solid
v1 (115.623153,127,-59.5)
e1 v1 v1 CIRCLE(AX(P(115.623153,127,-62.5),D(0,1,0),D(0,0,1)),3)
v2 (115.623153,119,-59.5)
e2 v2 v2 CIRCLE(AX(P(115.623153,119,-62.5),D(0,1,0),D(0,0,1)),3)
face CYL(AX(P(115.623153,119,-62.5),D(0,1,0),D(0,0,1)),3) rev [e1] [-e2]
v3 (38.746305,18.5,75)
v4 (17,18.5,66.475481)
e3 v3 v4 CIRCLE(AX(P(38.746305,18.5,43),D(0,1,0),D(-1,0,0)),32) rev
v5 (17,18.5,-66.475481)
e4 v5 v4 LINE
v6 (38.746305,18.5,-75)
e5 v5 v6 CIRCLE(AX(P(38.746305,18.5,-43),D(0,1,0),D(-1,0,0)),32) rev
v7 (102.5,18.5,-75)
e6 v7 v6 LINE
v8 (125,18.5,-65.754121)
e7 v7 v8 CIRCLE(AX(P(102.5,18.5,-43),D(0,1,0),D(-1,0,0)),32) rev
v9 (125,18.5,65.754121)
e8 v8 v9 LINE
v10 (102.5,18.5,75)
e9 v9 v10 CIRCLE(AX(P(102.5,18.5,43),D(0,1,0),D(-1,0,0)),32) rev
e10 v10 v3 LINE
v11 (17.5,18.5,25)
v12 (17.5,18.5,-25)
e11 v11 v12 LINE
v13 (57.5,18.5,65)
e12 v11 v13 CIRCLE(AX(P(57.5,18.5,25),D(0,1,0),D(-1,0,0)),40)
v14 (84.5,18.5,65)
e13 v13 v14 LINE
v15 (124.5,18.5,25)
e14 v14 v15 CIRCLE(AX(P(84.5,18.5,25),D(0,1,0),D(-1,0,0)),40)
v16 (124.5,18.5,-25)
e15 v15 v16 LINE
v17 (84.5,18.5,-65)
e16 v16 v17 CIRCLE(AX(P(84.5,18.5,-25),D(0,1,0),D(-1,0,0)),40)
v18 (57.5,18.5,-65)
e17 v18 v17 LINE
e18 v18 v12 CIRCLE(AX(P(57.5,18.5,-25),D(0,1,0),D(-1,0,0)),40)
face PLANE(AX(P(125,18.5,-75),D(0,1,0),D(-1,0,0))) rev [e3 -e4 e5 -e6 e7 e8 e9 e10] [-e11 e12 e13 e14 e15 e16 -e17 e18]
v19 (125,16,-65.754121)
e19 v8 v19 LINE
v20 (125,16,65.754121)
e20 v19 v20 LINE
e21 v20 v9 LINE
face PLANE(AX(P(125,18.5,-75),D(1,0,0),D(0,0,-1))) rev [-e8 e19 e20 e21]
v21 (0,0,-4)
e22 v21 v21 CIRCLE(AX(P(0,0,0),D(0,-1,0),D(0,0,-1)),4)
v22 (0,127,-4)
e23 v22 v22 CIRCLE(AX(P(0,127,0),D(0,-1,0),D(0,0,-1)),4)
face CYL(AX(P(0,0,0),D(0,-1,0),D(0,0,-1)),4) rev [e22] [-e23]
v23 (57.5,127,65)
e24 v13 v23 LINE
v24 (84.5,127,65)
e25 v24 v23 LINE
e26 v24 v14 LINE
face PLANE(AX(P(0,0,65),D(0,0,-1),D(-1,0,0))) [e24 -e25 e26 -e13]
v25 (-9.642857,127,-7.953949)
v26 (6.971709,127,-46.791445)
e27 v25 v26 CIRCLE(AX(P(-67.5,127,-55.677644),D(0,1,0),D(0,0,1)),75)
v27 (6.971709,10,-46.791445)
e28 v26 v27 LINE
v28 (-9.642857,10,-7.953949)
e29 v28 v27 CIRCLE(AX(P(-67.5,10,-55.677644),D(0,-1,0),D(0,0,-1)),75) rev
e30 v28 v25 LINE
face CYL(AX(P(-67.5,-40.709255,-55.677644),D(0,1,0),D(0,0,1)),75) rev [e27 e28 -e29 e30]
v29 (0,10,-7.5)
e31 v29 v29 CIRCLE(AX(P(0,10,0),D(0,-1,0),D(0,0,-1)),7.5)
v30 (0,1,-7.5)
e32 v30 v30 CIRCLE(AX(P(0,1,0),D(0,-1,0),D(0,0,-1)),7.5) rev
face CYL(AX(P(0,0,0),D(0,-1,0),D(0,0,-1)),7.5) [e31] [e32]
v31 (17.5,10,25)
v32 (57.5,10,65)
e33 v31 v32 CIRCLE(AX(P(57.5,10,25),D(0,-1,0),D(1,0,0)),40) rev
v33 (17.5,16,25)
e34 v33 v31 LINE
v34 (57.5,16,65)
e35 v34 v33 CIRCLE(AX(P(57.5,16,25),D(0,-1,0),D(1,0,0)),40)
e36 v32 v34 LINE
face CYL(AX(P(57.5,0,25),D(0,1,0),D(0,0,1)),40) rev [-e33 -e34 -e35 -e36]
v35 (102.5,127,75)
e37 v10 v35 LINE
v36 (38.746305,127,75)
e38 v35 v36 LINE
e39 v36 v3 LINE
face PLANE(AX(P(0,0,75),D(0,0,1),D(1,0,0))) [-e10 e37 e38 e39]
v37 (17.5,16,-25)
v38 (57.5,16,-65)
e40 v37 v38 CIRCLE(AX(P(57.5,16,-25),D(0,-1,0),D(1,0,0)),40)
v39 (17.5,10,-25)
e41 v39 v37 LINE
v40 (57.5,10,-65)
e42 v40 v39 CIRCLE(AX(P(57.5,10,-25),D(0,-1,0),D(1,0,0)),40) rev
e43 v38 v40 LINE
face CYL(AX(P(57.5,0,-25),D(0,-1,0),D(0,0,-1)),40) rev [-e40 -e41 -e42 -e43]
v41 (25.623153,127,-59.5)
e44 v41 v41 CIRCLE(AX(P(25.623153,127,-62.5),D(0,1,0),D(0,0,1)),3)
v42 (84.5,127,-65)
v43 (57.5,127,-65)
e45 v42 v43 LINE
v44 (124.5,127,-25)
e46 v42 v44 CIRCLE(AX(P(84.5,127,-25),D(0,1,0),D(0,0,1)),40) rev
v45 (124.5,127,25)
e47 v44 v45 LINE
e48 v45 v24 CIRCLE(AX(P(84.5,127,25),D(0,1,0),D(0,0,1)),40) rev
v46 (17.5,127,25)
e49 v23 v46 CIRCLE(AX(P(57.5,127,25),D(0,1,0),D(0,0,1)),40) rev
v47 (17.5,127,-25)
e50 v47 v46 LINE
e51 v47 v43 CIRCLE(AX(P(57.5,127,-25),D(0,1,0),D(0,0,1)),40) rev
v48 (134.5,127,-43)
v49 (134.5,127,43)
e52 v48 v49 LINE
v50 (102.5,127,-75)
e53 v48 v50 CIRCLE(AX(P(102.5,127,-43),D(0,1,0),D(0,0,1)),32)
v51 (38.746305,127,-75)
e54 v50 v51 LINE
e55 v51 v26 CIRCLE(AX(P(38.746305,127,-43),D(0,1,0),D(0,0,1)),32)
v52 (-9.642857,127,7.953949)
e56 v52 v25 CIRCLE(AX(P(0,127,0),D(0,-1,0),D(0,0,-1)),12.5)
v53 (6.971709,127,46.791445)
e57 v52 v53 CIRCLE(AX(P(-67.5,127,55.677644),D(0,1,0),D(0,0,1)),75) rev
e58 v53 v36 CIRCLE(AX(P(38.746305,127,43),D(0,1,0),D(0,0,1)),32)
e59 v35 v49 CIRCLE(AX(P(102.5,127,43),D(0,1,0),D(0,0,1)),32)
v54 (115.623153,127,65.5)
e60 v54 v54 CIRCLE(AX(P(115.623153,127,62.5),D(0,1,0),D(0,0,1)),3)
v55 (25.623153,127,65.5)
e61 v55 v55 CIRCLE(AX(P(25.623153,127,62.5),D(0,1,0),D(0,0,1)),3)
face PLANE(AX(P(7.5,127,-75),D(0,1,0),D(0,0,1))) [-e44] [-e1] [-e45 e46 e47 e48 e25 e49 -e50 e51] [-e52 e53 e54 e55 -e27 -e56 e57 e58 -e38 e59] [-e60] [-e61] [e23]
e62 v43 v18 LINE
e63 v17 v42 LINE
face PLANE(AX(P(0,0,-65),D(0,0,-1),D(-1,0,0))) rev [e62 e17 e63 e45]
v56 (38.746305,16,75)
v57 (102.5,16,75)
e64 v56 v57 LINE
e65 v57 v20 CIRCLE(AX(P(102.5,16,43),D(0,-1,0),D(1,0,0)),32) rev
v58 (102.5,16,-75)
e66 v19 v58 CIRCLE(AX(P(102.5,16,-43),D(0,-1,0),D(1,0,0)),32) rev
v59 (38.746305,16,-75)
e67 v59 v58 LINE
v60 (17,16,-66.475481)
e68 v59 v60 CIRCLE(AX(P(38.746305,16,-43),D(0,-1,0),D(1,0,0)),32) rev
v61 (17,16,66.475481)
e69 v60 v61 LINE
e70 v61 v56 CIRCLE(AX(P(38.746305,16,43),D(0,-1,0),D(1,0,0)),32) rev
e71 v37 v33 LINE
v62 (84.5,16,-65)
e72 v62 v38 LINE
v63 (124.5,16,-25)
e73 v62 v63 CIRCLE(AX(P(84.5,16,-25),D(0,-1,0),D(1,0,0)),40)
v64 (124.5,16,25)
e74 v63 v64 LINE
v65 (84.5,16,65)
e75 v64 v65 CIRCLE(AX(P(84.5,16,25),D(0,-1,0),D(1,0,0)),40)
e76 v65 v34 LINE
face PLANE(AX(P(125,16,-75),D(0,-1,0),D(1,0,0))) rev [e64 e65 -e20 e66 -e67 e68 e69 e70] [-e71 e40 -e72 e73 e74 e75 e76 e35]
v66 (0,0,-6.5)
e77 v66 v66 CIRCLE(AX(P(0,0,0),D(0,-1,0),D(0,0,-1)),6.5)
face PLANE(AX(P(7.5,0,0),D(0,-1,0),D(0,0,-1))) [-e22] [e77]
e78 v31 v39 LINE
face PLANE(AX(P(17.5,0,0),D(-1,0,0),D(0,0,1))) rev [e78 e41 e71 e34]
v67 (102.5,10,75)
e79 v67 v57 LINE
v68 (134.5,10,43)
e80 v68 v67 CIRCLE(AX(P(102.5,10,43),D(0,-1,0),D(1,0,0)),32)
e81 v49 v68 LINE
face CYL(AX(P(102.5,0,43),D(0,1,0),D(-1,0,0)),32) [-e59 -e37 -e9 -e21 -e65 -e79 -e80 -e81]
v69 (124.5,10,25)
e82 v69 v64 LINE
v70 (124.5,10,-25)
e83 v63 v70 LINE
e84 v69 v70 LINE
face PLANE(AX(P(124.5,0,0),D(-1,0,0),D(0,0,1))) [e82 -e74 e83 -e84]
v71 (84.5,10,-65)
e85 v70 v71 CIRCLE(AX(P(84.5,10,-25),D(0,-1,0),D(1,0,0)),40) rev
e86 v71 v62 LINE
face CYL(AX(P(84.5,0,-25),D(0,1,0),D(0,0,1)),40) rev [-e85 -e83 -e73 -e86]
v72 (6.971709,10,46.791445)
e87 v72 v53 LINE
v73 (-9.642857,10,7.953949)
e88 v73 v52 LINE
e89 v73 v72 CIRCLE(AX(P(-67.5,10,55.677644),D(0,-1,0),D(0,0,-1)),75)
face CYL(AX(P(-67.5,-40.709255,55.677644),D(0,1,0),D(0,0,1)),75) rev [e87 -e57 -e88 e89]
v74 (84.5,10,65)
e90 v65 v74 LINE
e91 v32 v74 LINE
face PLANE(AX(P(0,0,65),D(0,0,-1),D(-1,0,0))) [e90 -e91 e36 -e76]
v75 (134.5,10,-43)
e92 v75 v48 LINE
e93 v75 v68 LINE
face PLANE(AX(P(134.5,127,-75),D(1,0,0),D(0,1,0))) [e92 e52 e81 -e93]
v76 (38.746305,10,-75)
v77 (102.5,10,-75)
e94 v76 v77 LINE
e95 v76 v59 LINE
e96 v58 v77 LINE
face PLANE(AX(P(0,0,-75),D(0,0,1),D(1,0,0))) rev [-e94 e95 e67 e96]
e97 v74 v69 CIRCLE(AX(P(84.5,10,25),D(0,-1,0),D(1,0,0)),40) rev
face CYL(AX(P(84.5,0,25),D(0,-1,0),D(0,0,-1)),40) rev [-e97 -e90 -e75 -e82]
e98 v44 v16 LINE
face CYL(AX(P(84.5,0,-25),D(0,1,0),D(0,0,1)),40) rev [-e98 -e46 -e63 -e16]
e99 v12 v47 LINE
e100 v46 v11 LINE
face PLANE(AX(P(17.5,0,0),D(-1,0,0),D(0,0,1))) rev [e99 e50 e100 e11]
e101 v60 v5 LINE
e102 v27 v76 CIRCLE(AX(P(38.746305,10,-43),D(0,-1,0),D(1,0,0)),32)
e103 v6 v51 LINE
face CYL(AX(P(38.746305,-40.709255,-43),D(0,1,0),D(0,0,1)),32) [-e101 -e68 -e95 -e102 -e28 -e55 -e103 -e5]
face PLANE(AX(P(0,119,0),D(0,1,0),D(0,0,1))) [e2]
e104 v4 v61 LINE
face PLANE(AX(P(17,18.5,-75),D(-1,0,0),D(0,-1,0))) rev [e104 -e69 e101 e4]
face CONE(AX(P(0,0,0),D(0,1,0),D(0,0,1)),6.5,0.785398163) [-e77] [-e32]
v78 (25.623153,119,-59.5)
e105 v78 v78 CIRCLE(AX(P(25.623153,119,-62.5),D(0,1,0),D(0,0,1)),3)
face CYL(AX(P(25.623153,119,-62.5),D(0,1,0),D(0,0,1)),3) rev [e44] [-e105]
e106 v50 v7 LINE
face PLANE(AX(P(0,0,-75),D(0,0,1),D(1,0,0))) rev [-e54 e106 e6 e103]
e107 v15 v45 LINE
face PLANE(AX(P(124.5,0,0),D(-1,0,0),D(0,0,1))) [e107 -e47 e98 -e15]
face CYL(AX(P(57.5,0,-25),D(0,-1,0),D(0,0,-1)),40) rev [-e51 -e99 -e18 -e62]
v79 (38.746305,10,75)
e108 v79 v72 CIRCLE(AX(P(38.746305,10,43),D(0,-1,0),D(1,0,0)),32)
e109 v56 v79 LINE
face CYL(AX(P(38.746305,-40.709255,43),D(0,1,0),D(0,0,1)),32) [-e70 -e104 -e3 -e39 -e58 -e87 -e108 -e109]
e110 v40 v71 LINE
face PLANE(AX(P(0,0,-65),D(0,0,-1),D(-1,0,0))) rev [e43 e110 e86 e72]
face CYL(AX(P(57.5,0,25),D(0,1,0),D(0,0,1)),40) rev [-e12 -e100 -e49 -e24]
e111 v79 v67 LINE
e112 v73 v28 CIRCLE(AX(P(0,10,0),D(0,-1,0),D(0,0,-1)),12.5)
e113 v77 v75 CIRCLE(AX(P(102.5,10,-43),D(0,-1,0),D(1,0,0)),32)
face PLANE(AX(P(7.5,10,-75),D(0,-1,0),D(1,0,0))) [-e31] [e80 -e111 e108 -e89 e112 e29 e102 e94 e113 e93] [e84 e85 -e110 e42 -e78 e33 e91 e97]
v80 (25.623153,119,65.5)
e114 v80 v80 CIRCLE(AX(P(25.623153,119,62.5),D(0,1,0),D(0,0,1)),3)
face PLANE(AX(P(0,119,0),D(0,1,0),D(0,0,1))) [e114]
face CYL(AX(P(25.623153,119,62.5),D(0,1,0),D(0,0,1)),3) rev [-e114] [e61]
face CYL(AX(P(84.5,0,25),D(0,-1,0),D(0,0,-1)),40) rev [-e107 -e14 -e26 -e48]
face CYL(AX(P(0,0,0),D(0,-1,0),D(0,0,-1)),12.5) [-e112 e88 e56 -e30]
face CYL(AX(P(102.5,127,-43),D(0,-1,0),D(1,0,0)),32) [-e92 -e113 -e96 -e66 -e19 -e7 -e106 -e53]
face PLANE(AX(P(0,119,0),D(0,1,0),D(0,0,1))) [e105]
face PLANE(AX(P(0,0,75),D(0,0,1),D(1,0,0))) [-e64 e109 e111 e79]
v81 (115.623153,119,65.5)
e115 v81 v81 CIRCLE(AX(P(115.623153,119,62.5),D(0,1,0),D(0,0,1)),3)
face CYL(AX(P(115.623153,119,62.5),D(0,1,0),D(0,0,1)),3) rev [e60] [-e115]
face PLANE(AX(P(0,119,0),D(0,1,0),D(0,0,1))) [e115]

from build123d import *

# Parameters (mm, degrees)
CUT_EXTRUDE1_REACH       = 130.224
SKETCH3_W                = 13.598117377
SKETCH3_H                = 26.0138757
BOSS_EXTRUDE1_DEPTH      = 75
BOSS_EXTRUDE1_DEPTH_BACK = 75
SKETCH2_W                = 127
SKETCH2_H                = 117
BOSS_EXTRUDE3_START      = -117
BOSS_EXTRUDE3_DEPTH      = 117
CUT_EXTRUDE2_DEPTH       = 200.610245228
CUT_EXTRUDE2_DEPTH_BACK  = 200.610245228
SKETCH5_W                = 107
SKETCH5_H                = 130
CUT_EXTRUDE3_DEPTH       = 239.158035766
CUT_EXTRUDE3_DEPTH_BACK  = 239.158035766
SKETCH6_W                = 108
SKETCH6_H                = 2.5
FILLET3_R                = 40
FILLET2_R                = 32
CHAMFER1_SIZE            = 1
SKETCH7_R                = 3
CUT_EXTRUDE4_DEPTH       = 8


with BuildPart() as part:
    # Sketch1 → Revolve1 (revolve)
    with BuildSketch(Plane.XY, mode=Mode.PRIVATE) as revolve1_sk:
        Polygon((4, 0), (4, 127), (12.5, 127), (12.5, 10), (7.5, 10), (7.5, 0), align=None)
    revolve(revolve1_sk.sketch.rotate(Axis((0, 0, 0), (0, 1, 0)), 90), axis=Axis((0, 0, 0), (0, 1, 0)))

    # Sketch3 → Cut-Extrude1 (cut, up to next)
    with BuildSketch(Plane.XZ, mode=Mode.PRIVATE) as cut_extrude1_sk1:
        with Locations((14.299058689, 0)):
            Rectangle(SKETCH3_W, SKETCH3_H)
    cut_extrude1_tool1 = extrude(cut_extrude1_sk1.sketch, amount=-CUT_EXTRUDE1_REACH, mode=Mode.PRIVATE) & part.part
    add(cut_extrude1_tool1.solids().sort_by_distance((14.299059, 0, 0))[0], mode=Mode.SUBTRACT)



with BuildPart() as body_2:
    # Sketch2 → Boss-Extrude1 (new, two sides: drawn at the far end of the back side and taken through both)
    with BuildSketch(Plane.XY.offset(-BOSS_EXTRUDE1_DEPTH_BACK)):
        with Locations((71, 68.5)):
            Rectangle(SKETCH2_W, SKETCH2_H)
    extrude(amount=BOSS_EXTRUDE1_DEPTH + BOSS_EXTRUDE1_DEPTH_BACK)


with BuildPart() as part_1:
    add(part.part)

    add(body_2.part)  # Boss-Extrude3 merges body 2
    # Sketch4 → Boss-Extrude3 (add)
    with BuildSketch(Plane(origin=(0, 127, 0), x_dir=(1, 0, 0), z_dir=(0, 1, 0)).offset(BOSS_EXTRUDE3_START)):
        with BuildLine():
            Line((7.5, -55.677643628), (7.5, -10))
            ThreePointArc((7.5, -10), (-1.481398078, -12.411907981), (-9.642857143, -7.95394909))
            ThreePointArc((-9.642857143, -7.95394909), (3.084296109, -30.323015986), (7.5, -55.677643628))
        make_face()
        with BuildLine():
            Line((7.5, 10), (7.5, 55.677643628))
            ThreePointArc((7.5, 55.677643628), (3.084296109, 30.323015986), (-9.642857143, 7.95394909))
            ThreePointArc((-9.642857143, 7.95394909), (-1.481398078, 12.411907981), (7.5, 10))
        make_face()
    extrude(amount=BOSS_EXTRUDE3_DEPTH)

    # Sketch5 → Cut-Extrude2 (cut, two sides: drawn at the far end of the back side and taken through both)
    with BuildSketch(Plane(origin=(0, 127, 0), x_dir=(1, 0, 0), z_dir=(0, 1, 0)).offset(-CUT_EXTRUDE2_DEPTH_BACK)):
        with Locations((71, 0)):
            Rectangle(SKETCH5_W, SKETCH5_H)
    extrude(amount=CUT_EXTRUDE2_DEPTH + CUT_EXTRUDE2_DEPTH_BACK, mode=Mode.SUBTRACT)

    # Sketch6 → Cut-Extrude3 (cut, two sides: drawn at the far end of the back side and taken through both)
    with BuildSketch(Plane.XY.offset(75).offset(-CUT_EXTRUDE3_DEPTH_BACK)):
        with Locations((71, 17.25)):
            Rectangle(SKETCH6_W, SKETCH6_H)
    extrude(amount=CUT_EXTRUDE3_DEPTH + CUT_EXTRUDE3_DEPTH_BACK, mode=Mode.SUBTRACT)

    # Fillet3
    fillet3_edges = [part_1.edges().sort_by_distance(p)[0] for p in [
        (17.5, 13, -65),
        (124.5, 13, -65),
        (124.5, 13, 65),
        (17.5, 13, 65),
        (17.5, 72.75, -65),
        (17.5, 72.75, 65),
        (124.5, 72.75, 65),
        (124.5, 72.75, -65),
    ]]
    fillet(fillet3_edges, radius=FILLET3_R)

    # Fillet2
    # the kernel refuses this fillet: 32 mm, written as the material it takes off along each edge
    with BuildSketch(Plane(origin=(7.5, -68.115762804, -75), x_dir=(1, 0, 0), z_dir=(0, 1, 0))) as fillet2_piece_1:
        with BuildLine():
            CenterArc((31.246305122, -32), FILLET2_R, 90, 83.19545987)
            Line((-0.528290802, -28.208555177), (-3.705750395, -27.829410694))
            ThreePointArc((-3.705750395, -27.829410694), (-3.2, -19.322356372), (-3.2, 0))
            Line((-3.2, 0), (0, 3.2))
            Line((0, 3.2), (31.246305122, 3.2))
            Line((31.246305122, 3.2), (31.246305122, 0))
        make_face()
    extrude(amount=273.231525609, mode=Mode.SUBTRACT)
    with BuildSketch(Plane(origin=(134.5, 207, -75), x_dir=(0, 0, 1), z_dir=(0, -1, 0)), Plane(origin=(134.5, 207, 75), x_dir=(-1, 0, 0), z_dir=(0, -1, 0))) as fillet2_piece_2:
        with BuildLine():
            CenterArc((FILLET2_R, FILLET2_R), FILLET2_R, 180, 90)
            Line((0, FILLET2_R), (0, 0))
            Line((0, 0), (FILLET2_R, 0))
        make_face()
    extrude(amount=277, mode=Mode.SUBTRACT)
    with BuildSketch(Plane(origin=(7.5, -68.115762804, 75), x_dir=(1, 0, 0), z_dir=(0, 1, 0))) as fillet2_piece_3:
        with BuildLine():
            CenterArc((31.246305122, 32), FILLET2_R, 186.80454013, 83.19545987)
            Line((-0.528290802, 28.208555177), (-3.705750395, 27.829410694))
            ThreePointArc((-3.705750395, 27.829410694), (-3.2, 19.322356372), (-3.2, 0))
            Line((-3.2, 0), (0, -3.2))
            Line((0, -3.2), (31.246305122, -3.2))
            Line((31.246305122, -3.2), (31.246305122, 0))
        make_face()
    extrude(amount=273.231525609, mode=Mode.SUBTRACT)

    # Chamfer1
    chamfer1_edges = [part_1.edges().sort_by_distance(p)[0] for p in [
        (0, 0, 7.5),
    ]]
    chamfer(chamfer1_edges, length=CHAMFER1_SIZE)

    # Sketch7 → Cut-Extrude4 (cut)
    with BuildSketch(Plane(origin=(0, 127, 0), x_dir=(1, 0, 0), z_dir=(0, 1, 0))):
        with Locations(Location((115.623152561, -62.5, 0), (0, 0, 270))):
            Circle(SKETCH7_R)
        with Locations(Location((25.623152561, -62.5, 0), (0, 0, 270))):
            Circle(SKETCH7_R)
        with Locations(Location((25.623152561, 62.5, 0), (0, 0, 270))):
            Circle(SKETCH7_R)
        with Locations(Location((115.623152561, 62.5, 0), (0, 0, 270))):
            Circle(SKETCH7_R)
    extrude(amount=-CUT_EXTRUDE4_DEPTH, mode=Mode.SUBTRACT)


solid = part_1.part
